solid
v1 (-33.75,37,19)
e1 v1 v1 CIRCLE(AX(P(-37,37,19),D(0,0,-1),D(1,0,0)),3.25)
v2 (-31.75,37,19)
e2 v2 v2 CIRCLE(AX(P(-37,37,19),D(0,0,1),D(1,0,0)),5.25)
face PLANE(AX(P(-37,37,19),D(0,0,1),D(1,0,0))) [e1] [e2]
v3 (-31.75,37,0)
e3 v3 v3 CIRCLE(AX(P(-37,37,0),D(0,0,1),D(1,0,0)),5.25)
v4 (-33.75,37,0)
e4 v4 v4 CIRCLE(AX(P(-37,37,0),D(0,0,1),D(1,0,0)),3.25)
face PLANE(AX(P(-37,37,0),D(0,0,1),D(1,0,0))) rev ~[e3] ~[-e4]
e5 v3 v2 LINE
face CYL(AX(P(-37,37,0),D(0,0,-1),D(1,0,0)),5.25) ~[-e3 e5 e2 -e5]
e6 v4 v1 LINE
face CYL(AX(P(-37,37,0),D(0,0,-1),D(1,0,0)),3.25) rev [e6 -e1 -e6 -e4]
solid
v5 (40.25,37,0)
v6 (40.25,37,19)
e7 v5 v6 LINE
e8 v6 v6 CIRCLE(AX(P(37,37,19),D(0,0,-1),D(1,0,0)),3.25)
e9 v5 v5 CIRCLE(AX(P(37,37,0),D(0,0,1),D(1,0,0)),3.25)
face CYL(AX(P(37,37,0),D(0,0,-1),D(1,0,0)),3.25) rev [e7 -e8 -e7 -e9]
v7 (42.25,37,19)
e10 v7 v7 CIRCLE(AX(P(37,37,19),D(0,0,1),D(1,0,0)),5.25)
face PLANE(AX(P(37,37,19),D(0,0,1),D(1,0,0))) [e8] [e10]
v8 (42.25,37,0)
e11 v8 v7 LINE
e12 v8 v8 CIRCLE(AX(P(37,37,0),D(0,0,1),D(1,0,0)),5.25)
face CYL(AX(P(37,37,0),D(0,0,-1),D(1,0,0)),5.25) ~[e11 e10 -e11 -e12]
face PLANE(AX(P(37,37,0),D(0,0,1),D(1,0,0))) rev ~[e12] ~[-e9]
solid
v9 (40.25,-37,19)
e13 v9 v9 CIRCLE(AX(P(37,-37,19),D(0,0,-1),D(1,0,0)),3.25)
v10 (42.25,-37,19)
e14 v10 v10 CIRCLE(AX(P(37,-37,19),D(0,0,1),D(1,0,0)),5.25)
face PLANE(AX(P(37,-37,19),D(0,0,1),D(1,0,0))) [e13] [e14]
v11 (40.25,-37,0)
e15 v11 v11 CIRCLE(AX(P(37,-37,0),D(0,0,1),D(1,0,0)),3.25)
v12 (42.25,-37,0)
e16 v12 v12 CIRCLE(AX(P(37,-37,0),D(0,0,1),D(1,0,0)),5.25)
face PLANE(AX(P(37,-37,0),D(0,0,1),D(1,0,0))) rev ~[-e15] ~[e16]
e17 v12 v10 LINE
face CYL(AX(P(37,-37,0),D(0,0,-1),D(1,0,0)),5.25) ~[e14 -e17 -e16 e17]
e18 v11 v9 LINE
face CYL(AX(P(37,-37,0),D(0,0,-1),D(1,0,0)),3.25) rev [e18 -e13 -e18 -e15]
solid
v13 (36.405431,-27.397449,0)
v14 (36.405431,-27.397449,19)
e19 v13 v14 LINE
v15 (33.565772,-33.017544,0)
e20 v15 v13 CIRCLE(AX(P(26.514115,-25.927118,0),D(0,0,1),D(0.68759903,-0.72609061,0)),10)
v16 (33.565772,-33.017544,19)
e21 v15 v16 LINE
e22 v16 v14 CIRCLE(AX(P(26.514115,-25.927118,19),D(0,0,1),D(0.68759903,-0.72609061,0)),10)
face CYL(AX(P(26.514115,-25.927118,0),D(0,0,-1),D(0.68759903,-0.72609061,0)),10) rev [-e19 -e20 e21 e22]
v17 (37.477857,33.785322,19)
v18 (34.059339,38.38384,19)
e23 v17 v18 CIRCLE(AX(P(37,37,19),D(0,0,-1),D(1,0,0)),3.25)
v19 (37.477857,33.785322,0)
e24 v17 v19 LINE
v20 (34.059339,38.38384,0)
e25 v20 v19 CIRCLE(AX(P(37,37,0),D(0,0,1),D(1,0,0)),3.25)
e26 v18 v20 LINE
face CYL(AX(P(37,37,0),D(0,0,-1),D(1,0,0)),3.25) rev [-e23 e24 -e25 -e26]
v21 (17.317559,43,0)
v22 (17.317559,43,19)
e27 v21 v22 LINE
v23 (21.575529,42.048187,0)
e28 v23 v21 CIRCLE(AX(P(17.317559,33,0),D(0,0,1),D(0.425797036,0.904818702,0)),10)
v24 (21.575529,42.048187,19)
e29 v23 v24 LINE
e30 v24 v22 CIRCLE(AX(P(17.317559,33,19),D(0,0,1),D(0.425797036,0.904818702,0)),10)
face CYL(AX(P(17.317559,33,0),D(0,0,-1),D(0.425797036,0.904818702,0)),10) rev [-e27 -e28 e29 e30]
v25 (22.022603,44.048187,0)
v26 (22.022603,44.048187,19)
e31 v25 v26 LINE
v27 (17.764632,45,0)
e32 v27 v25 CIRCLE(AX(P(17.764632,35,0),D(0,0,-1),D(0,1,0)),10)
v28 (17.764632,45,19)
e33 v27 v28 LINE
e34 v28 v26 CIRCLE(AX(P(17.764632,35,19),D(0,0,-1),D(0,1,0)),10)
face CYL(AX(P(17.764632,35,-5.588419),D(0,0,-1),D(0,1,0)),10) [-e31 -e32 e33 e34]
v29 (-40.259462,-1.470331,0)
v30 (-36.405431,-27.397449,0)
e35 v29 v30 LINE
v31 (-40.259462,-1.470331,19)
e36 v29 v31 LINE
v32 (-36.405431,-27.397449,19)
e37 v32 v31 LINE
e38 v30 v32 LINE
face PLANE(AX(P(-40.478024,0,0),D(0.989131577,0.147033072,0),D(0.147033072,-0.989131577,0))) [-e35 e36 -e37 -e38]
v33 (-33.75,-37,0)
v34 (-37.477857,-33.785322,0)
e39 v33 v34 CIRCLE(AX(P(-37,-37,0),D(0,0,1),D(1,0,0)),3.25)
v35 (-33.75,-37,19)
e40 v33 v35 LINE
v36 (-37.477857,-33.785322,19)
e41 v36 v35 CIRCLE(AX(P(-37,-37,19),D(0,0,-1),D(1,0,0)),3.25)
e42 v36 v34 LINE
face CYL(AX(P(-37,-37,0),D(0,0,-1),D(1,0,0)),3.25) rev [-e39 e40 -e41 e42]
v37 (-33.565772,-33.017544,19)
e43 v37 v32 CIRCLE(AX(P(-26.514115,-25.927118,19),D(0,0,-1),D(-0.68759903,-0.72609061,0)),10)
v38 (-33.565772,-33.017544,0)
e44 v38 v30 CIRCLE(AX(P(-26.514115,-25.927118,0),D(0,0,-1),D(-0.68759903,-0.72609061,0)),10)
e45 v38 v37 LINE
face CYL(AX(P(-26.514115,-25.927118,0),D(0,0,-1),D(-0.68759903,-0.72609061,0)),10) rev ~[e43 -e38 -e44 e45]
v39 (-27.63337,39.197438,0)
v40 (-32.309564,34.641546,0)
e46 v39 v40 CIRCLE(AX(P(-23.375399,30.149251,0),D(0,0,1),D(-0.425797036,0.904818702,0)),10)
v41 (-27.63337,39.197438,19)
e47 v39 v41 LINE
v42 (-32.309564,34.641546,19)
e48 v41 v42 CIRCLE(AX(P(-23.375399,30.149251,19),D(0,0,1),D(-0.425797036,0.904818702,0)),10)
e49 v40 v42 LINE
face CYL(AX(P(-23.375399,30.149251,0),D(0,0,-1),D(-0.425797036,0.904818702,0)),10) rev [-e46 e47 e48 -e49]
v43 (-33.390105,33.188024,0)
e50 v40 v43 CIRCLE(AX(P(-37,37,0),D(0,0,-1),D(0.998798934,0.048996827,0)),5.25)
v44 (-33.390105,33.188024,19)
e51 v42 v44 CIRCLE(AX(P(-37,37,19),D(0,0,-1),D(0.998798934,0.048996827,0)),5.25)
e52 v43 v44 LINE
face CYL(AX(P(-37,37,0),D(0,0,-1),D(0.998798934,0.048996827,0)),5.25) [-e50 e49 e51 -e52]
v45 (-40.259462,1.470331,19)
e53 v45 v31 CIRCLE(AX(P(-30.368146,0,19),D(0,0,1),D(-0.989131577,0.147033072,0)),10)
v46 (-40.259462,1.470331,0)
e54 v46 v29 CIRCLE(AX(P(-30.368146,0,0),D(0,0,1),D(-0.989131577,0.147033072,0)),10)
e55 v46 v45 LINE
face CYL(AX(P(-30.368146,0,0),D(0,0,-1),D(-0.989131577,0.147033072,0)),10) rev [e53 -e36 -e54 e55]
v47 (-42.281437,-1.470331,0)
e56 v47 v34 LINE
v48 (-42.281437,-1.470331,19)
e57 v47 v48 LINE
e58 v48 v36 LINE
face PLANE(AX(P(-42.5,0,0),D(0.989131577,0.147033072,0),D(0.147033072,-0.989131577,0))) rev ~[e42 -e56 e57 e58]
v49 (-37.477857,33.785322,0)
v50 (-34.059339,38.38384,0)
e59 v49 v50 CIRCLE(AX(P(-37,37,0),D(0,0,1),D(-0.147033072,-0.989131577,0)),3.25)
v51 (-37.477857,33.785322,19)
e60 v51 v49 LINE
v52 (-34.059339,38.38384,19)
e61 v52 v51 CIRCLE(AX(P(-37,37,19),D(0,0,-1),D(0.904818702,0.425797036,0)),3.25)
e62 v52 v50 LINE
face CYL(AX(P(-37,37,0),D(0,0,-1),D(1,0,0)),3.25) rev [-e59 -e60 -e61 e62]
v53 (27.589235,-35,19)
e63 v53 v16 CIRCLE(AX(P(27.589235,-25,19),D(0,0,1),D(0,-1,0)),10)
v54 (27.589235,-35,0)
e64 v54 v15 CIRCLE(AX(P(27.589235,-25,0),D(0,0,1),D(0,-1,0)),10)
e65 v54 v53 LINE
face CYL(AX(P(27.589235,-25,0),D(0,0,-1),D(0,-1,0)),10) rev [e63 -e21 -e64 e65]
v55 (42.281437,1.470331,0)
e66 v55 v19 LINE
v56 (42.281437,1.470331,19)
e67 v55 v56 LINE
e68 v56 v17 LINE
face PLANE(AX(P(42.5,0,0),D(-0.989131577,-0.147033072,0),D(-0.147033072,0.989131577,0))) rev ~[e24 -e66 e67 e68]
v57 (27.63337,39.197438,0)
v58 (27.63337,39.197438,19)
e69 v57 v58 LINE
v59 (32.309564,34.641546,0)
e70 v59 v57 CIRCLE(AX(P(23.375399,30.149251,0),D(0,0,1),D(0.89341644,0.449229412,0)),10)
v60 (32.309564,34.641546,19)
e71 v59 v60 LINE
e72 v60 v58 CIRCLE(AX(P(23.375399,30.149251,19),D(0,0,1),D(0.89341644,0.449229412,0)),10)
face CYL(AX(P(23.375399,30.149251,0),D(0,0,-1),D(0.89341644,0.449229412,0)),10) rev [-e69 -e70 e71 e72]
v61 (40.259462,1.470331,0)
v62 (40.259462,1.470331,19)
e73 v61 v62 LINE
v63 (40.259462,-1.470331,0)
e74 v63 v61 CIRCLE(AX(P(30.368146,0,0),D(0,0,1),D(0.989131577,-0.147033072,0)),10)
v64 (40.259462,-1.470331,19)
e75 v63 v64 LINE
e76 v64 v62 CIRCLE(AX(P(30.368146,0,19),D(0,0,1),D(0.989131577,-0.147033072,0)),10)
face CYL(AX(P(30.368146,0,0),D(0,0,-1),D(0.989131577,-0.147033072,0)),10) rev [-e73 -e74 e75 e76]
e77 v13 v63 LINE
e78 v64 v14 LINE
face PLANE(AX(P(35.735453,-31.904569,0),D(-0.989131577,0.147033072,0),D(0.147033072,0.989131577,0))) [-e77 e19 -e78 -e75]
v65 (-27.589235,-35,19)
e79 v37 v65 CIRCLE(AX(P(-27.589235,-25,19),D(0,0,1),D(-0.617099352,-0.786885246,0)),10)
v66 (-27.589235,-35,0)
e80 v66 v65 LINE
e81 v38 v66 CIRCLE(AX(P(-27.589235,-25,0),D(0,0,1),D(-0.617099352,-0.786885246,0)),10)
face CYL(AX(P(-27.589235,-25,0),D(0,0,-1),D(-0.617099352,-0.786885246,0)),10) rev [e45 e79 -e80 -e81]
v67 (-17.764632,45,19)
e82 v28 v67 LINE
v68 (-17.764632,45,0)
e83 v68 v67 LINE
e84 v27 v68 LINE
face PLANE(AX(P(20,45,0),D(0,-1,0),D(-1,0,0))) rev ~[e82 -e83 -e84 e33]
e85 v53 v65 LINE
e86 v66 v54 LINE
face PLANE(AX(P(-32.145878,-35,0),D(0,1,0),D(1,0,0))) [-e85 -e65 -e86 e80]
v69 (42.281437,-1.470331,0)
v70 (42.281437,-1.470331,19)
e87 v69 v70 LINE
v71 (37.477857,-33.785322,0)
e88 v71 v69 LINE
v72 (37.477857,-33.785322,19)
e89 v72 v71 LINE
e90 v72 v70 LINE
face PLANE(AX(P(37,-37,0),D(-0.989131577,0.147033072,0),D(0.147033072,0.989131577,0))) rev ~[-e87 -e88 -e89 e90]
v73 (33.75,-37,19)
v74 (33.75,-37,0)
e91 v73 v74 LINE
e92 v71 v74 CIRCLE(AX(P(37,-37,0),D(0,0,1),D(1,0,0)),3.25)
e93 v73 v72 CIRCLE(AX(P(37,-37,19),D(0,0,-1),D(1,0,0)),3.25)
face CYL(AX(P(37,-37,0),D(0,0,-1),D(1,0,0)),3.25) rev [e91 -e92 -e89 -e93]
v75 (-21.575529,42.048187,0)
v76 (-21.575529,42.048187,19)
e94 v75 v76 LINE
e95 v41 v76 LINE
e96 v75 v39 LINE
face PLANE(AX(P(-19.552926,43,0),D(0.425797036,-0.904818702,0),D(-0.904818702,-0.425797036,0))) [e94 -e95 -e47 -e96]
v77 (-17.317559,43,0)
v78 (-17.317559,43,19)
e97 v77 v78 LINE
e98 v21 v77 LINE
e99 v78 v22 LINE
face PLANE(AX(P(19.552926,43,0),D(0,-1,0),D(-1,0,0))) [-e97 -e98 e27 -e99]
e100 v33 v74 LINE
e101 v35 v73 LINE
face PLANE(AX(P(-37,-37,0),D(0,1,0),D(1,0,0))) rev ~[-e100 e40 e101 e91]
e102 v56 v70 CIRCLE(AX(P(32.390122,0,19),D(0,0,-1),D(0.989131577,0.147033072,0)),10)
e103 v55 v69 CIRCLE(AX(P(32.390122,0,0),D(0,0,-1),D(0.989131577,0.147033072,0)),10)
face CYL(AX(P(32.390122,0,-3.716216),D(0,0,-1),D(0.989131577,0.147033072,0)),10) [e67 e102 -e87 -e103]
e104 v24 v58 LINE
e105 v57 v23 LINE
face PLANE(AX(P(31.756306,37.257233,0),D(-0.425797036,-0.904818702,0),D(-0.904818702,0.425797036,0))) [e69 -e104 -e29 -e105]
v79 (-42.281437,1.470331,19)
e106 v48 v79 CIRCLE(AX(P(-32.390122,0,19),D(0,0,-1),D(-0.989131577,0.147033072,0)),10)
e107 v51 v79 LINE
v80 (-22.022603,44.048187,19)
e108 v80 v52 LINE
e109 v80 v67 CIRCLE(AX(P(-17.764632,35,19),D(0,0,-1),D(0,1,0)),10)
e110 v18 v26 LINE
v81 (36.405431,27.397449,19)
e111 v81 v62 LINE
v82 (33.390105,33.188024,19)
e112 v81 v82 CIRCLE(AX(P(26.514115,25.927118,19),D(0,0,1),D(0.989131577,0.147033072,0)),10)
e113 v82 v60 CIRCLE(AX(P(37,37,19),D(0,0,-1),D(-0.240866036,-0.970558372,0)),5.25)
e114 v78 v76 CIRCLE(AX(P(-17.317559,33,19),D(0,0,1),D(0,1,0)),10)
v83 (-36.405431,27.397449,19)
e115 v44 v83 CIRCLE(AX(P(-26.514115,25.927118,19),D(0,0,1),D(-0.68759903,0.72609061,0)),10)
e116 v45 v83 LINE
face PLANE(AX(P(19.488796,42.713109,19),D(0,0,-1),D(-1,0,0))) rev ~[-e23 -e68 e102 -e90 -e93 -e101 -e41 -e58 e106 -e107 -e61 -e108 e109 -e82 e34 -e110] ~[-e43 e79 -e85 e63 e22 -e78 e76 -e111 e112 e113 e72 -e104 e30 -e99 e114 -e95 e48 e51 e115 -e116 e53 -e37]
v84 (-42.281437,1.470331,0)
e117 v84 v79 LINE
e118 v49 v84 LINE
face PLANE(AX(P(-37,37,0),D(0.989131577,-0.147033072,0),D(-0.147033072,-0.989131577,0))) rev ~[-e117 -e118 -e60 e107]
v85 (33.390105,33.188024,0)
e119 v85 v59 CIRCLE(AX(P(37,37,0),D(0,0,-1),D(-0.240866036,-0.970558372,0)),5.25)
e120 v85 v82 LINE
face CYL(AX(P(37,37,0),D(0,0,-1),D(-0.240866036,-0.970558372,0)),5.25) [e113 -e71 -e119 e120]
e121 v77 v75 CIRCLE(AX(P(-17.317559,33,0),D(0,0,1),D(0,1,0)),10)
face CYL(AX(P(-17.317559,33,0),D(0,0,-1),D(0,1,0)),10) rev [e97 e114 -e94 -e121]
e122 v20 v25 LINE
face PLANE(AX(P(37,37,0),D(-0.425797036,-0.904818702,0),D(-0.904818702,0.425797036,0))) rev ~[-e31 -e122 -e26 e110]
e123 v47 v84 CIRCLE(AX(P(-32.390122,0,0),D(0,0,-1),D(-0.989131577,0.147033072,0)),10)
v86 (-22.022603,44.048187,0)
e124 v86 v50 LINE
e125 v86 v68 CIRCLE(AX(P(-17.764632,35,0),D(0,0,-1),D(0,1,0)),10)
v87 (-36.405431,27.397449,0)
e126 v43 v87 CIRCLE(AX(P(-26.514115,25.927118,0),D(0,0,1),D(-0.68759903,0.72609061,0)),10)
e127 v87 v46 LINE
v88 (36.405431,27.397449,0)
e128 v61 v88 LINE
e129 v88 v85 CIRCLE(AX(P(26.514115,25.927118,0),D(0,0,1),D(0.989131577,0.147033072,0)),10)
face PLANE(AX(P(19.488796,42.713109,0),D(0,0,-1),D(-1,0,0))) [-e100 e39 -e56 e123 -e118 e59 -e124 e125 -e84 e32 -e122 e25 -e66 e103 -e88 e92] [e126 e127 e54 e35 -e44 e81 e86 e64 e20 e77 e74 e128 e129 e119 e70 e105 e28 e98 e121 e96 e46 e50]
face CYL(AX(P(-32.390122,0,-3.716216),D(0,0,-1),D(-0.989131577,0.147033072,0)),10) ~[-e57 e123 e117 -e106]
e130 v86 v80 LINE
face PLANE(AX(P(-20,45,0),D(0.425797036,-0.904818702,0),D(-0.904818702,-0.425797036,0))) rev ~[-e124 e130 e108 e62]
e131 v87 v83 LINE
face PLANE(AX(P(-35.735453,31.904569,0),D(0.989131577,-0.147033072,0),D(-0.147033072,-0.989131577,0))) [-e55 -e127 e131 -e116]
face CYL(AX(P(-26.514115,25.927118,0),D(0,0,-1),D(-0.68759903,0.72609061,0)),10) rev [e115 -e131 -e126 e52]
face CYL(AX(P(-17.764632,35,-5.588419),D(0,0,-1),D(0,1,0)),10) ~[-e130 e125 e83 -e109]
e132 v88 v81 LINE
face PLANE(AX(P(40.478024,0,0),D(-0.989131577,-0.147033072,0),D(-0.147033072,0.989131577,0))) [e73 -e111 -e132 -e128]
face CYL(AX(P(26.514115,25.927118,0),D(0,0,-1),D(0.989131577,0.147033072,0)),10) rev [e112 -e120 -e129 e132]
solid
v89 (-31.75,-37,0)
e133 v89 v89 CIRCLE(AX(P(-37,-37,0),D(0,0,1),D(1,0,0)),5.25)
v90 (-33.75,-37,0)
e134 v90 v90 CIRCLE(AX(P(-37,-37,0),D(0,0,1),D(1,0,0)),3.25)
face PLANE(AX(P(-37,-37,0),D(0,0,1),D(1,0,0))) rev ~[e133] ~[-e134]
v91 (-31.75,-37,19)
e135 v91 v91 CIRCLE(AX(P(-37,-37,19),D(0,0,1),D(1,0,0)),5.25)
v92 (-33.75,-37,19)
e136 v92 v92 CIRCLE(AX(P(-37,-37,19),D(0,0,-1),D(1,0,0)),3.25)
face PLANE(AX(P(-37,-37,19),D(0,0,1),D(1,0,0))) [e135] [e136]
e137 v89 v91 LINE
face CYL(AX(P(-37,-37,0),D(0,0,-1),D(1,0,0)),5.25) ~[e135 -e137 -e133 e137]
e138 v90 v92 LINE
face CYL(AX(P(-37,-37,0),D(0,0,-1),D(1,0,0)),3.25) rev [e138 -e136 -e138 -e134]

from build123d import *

# Parameters (mm, degrees)
F0_R        = 5.25
F1_DEPTH    = 19
F3_DEPTH    = 19
F4_R        = 3.25
F5_DEPTH    = 25
F7_DEPTH    = 25
F8_T1_DEPTH = 19
F8_T3_DEPTH = 26.4324324324
F8_T5_DEPTH = 30.1768389253


# Not quite as in the source:
# - a fillet or chamfer that OpenCascade refuses, or shapes differently, is made with other operations: its cross-section is extruded or revolved along the edge and cut away or added


with BuildPart() as f1:
    # F0 (on Top) → F1 (new body)
    with BuildSketch(Plane.XY):
        with Locations((-37, 37)):
            Circle(F0_R)
    extrude(amount=F1_DEPTH)


with BuildPart() as f1b:
    # F0 (on Top) → F1, piece 2 (new body)
    with BuildSketch(Plane.XY):
        with Locations((37, 37)):
            Circle(F0_R)
    extrude(amount=F1_DEPTH)


with BuildPart() as f1c:
    # F0 (on Top) → F1, piece 3 (new body)
    with BuildSketch(Plane.XY):
        with Locations((37, -37)):
            Circle(F0_R)
    extrude(amount=F1_DEPTH)


with BuildPart() as f1d:
    # F0 (on Top) → F1, piece 4 (new body)
    with BuildSketch(Plane.XY):
        with Locations((-37, -37)):
            Circle(F0_R)
    extrude(amount=F1_DEPTH)


with BuildPart() as f3:
    # F2 (on Top) → F3 (new body)
    with BuildSketch(Plane.XY):
        Polygon((20, 45), (-20, 45), (-37, 37), (-42.5, 0), (-37, -37), (37, -37), (42.5, 0), (37, 37), align=None)
    extrude(amount=F3_DEPTH)


with BuildPart() as f5_tool:
    # F4 (on Top) → F5 (new body)
    with BuildSketch(Plane.XY):
        with Locations((-37, 37)):
            Circle(F4_R)
        with Locations((37, 37)):
            Circle(F4_R)
        with Locations((37, -37)):
            Circle(F4_R)
        with Locations((-37, -37)):
            Circle(F4_R)
    extrude(amount=F5_DEPTH)


with BuildPart() as f1_1:
    add(f1.part)

    # F5: cut by f5_tool
    add(f5_tool.part, mode=Mode.SUBTRACT)


with BuildPart() as f1b_1:
    add(f1b.part)

    # F5: cut by f5_tool
    add(f5_tool.part, mode=Mode.SUBTRACT)


with BuildPart() as f1c_1:
    add(f1c.part)

    # F5: cut by f5_tool
    add(f5_tool.part, mode=Mode.SUBTRACT)


with BuildPart() as f1d_1:
    add(f1d.part)

    # F5: cut by f5_tool
    add(f5_tool.part, mode=Mode.SUBTRACT)


with BuildPart() as f3_1:
    add(f3.part)

    # F5: cut by f5_tool
    add(f5_tool.part, mode=Mode.SUBTRACT)

    # F6 (on Top) → F7 (cut)
    with BuildSketch(Plane.XY):
        with BuildLine():
            Line((19.552926443, 43), (-19.552926443, 43))
            Line((-19.552926443, 43), (-31.7563055954, 37.25723334))
            ThreePointArc((-31.7563055954, 37.25723334), (-32.7866811629, 33.8678371088), (-35.7354533115, 31.9045685489))
            Line((-35.7354533115, 31.9045685489), (-40.478024312, 0))
            Line((-40.478024312, 0), (-35.7354533115, -31.9045685489))
            ThreePointArc((-35.7354533115, -31.9045685489), (-33.571450675, -33.0241290858), (-32.1458780403, -35))
            Line((-32.1458780403, -35), (32.1458780403, -35))
            ThreePointArc((32.1458780403, -35), (33.571450675, -33.0241290858), (35.7354533115, -31.9045685489))
            Line((35.7354533115, -31.9045685489), (40.478024312, 0))
            Line((40.478024312, 0), (35.7354533115, 31.9045685489))
            ThreePointArc((35.7354533115, 31.9045685489), (32.7866811629, 33.8678371088), (31.7563055954, 37.25723334))
            Line((31.7563055954, 37.25723334), (19.552926443, 43))
        make_face()
    extrude(amount=F7_DEPTH, mode=Mode.SUBTRACT)

    # F8: fillet of radius 10 on 16 edges, made by hand

    # F8_s2 → F8_t1 (join)
    with BuildSketch(Plane.XY):
        with BuildLine():
            ThreePointArc((21.5755290212, 42.048187022), (19.4990867668, 42.7591462285), (17.3175586579, 43))
            Line((17.3175586579, 43), (19.552926443, 43))
            Line((19.552926443, 43), (21.5755290212, 42.048187022))
        make_face()
        with BuildLine():
            ThreePointArc((-17.3175586579, 43), (-19.4990867668, 42.7591462285), (-21.5755290212, 42.048187022))
            Line((-21.5755290212, 42.048187022), (-19.552926443, 43))
            Line((-19.552926443, 43), (-17.3175586579, 43))
        make_face()
        with BuildLine():
            ThreePointArc((-40.2594616371, 1.4703307219), (-40.3681458718, 0), (-40.2594616371, -1.4703307219))
            Line((-40.2594616371, -1.4703307219), (-40.478024312, 0))
            Line((-40.478024312, 0), (-40.2594616371, 1.4703307219))
        make_face()
        with BuildLine():
            ThreePointArc((40.2594616371, -1.4703307219), (40.3681458718, 0), (40.2594616371, 1.4703307219))
            Line((40.2594616371, 1.4703307219), (40.478024312, 0))
            Line((40.478024312, 0), (40.2594616371, -1.4703307219))
        make_face()
        with BuildLine():
            ThreePointArc((-33.3901050909, 33.188024299), (-35.3836316287, 30.5457403999), (-36.405430553, 27.3974489237))
            Line((-36.405430553, 27.3974489237), (-35.7354533115, 31.9045685489))
            ThreePointArc((-35.7354533115, 31.9045685489), (-34.4797103564, 32.3944989293), (-33.3901050909, 33.188024299))
        make_face()
        with BuildLine():
            ThreePointArc((-27.6333696517, 39.19743849), (-30.3537332547, 37.3118526055), (-32.3095636894, 34.6415455874))
            ThreePointArc((-32.3095636894, 34.6415455874), (-31.8636400174, 35.9135810529), (-31.7563055954, 37.25723334))
            Line((-31.7563055954, 37.25723334), (-27.6333696517, 39.19743849))
        make_face()
        with BuildLine():
            ThreePointArc((-33.3901050909, -33.188024299), (-35.3836316287, -30.5457403999), (-36.405430553, -27.3974489237))
            Line((-36.405430553, -27.3974489237), (-35.7354533115, -31.9045685489))
            ThreePointArc((-35.7354533115, -31.9045685489), (-34.4797103564, -32.3944989293), (-33.3901050909, -33.188024299))
        make_face()
        with BuildLine():
            ThreePointArc((-33.7602284039, -32.868852459), (-30.8535476338, -34.452209387), (-27.5892348876, -35))
            Line((-27.5892348876, -35), (-32.1458780403, -35))
            ThreePointArc((-32.1458780403, -35), (-32.8151193944, -33.8299409601), (-33.7602284039, -32.868852459))
        make_face()
        with BuildLine():
            ThreePointArc((36.405430553, 27.3974489237), (35.3836316287, 30.5457403999), (33.3901050909, 33.188024299))
            ThreePointArc((33.3901050909, 33.188024299), (34.4797103564, 32.3944989293), (35.7354533115, 31.9045685489))
            Line((35.7354533115, 31.9045685489), (36.405430553, 27.3974489237))
        make_face()
        with BuildLine():
            ThreePointArc((32.3095636894, 34.6415455874), (30.3537332547, 37.3118526055), (27.6333696517, 39.19743849))
            Line((27.6333696517, 39.19743849), (31.7563055954, 37.25723334))
            ThreePointArc((31.7563055954, 37.25723334), (31.8636400174, 35.9135810529), (32.3095636894, 34.6415455874))
        make_face()
        with BuildLine():
            ThreePointArc((27.5892348876, -35), (30.8535476338, -34.452209387), (33.7602284039, -32.868852459))
            ThreePointArc((33.7602284039, -32.868852459), (32.8151193944, -33.8299409601), (32.1458780403, -35))
            Line((32.1458780403, -35), (27.5892348876, -35))
        make_face()
        with BuildLine():
            ThreePointArc((33.3901050909, -33.188024299), (35.3836316287, -30.5457403999), (36.405430553, -27.3974489237))
            Line((36.405430553, -27.3974489237), (35.7354533115, -31.9045685489))
            ThreePointArc((35.7354533115, -31.9045685489), (34.4797103564, -32.3944989293), (33.3901050909, -33.188024299))
        make_face()
    extrude(amount=F8_T1_DEPTH)

    # F8_s4 → F8_t3 (cut)
    with BuildSketch(Plane.XY.offset(-3.7162162162)):
        with BuildLine():
            ThreePointArc((42.2814373251, 1.4703307219), (42.3901215599, 0), (42.2814373251, -1.4703307219))
            Line((42.2814373251, -1.4703307219), (42.5, 0))
            Line((42.5, 0), (42.2814373251, 1.4703307219))
        make_face()
        with BuildLine():
            ThreePointArc((-42.2814373251, 1.4703307219), (-42.3901215599, 0), (-42.2814373251, -1.4703307219))
            Line((-42.2814373251, -1.4703307219), (-42.5, 0))
            Line((-42.5, 0), (-42.2814373251, 1.4703307219))
        make_face()
    extrude(amount=F8_T3_DEPTH, mode=Mode.SUBTRACT)

    # F8_s6 → F8_t5 (cut)
    with BuildSketch(Plane.XY.offset(-5.5884194627)):
        with BuildLine():
            ThreePointArc((-17.7646322149, 45), (-19.9461603238, 44.7591462285), (-22.0226025782, 44.048187022))
            Line((-22.0226025782, 44.048187022), (-20, 45))
            Line((-20, 45), (-17.7646322149, 45))
        make_face()
        with BuildLine():
            ThreePointArc((17.7646322149, 45), (19.9461603238, 44.7591462285), (22.0226025782, 44.048187022))
            Line((22.0226025782, 44.048187022), (20, 45))
            Line((20, 45), (17.7646322149, 45))
        make_face()
    extrude(amount=F8_T5_DEPTH, mode=Mode.SUBTRACT)


solid = Compound([f1_1.part, f1b_1.part, f1c_1.part, f1d_1.part, f3_1.part])
